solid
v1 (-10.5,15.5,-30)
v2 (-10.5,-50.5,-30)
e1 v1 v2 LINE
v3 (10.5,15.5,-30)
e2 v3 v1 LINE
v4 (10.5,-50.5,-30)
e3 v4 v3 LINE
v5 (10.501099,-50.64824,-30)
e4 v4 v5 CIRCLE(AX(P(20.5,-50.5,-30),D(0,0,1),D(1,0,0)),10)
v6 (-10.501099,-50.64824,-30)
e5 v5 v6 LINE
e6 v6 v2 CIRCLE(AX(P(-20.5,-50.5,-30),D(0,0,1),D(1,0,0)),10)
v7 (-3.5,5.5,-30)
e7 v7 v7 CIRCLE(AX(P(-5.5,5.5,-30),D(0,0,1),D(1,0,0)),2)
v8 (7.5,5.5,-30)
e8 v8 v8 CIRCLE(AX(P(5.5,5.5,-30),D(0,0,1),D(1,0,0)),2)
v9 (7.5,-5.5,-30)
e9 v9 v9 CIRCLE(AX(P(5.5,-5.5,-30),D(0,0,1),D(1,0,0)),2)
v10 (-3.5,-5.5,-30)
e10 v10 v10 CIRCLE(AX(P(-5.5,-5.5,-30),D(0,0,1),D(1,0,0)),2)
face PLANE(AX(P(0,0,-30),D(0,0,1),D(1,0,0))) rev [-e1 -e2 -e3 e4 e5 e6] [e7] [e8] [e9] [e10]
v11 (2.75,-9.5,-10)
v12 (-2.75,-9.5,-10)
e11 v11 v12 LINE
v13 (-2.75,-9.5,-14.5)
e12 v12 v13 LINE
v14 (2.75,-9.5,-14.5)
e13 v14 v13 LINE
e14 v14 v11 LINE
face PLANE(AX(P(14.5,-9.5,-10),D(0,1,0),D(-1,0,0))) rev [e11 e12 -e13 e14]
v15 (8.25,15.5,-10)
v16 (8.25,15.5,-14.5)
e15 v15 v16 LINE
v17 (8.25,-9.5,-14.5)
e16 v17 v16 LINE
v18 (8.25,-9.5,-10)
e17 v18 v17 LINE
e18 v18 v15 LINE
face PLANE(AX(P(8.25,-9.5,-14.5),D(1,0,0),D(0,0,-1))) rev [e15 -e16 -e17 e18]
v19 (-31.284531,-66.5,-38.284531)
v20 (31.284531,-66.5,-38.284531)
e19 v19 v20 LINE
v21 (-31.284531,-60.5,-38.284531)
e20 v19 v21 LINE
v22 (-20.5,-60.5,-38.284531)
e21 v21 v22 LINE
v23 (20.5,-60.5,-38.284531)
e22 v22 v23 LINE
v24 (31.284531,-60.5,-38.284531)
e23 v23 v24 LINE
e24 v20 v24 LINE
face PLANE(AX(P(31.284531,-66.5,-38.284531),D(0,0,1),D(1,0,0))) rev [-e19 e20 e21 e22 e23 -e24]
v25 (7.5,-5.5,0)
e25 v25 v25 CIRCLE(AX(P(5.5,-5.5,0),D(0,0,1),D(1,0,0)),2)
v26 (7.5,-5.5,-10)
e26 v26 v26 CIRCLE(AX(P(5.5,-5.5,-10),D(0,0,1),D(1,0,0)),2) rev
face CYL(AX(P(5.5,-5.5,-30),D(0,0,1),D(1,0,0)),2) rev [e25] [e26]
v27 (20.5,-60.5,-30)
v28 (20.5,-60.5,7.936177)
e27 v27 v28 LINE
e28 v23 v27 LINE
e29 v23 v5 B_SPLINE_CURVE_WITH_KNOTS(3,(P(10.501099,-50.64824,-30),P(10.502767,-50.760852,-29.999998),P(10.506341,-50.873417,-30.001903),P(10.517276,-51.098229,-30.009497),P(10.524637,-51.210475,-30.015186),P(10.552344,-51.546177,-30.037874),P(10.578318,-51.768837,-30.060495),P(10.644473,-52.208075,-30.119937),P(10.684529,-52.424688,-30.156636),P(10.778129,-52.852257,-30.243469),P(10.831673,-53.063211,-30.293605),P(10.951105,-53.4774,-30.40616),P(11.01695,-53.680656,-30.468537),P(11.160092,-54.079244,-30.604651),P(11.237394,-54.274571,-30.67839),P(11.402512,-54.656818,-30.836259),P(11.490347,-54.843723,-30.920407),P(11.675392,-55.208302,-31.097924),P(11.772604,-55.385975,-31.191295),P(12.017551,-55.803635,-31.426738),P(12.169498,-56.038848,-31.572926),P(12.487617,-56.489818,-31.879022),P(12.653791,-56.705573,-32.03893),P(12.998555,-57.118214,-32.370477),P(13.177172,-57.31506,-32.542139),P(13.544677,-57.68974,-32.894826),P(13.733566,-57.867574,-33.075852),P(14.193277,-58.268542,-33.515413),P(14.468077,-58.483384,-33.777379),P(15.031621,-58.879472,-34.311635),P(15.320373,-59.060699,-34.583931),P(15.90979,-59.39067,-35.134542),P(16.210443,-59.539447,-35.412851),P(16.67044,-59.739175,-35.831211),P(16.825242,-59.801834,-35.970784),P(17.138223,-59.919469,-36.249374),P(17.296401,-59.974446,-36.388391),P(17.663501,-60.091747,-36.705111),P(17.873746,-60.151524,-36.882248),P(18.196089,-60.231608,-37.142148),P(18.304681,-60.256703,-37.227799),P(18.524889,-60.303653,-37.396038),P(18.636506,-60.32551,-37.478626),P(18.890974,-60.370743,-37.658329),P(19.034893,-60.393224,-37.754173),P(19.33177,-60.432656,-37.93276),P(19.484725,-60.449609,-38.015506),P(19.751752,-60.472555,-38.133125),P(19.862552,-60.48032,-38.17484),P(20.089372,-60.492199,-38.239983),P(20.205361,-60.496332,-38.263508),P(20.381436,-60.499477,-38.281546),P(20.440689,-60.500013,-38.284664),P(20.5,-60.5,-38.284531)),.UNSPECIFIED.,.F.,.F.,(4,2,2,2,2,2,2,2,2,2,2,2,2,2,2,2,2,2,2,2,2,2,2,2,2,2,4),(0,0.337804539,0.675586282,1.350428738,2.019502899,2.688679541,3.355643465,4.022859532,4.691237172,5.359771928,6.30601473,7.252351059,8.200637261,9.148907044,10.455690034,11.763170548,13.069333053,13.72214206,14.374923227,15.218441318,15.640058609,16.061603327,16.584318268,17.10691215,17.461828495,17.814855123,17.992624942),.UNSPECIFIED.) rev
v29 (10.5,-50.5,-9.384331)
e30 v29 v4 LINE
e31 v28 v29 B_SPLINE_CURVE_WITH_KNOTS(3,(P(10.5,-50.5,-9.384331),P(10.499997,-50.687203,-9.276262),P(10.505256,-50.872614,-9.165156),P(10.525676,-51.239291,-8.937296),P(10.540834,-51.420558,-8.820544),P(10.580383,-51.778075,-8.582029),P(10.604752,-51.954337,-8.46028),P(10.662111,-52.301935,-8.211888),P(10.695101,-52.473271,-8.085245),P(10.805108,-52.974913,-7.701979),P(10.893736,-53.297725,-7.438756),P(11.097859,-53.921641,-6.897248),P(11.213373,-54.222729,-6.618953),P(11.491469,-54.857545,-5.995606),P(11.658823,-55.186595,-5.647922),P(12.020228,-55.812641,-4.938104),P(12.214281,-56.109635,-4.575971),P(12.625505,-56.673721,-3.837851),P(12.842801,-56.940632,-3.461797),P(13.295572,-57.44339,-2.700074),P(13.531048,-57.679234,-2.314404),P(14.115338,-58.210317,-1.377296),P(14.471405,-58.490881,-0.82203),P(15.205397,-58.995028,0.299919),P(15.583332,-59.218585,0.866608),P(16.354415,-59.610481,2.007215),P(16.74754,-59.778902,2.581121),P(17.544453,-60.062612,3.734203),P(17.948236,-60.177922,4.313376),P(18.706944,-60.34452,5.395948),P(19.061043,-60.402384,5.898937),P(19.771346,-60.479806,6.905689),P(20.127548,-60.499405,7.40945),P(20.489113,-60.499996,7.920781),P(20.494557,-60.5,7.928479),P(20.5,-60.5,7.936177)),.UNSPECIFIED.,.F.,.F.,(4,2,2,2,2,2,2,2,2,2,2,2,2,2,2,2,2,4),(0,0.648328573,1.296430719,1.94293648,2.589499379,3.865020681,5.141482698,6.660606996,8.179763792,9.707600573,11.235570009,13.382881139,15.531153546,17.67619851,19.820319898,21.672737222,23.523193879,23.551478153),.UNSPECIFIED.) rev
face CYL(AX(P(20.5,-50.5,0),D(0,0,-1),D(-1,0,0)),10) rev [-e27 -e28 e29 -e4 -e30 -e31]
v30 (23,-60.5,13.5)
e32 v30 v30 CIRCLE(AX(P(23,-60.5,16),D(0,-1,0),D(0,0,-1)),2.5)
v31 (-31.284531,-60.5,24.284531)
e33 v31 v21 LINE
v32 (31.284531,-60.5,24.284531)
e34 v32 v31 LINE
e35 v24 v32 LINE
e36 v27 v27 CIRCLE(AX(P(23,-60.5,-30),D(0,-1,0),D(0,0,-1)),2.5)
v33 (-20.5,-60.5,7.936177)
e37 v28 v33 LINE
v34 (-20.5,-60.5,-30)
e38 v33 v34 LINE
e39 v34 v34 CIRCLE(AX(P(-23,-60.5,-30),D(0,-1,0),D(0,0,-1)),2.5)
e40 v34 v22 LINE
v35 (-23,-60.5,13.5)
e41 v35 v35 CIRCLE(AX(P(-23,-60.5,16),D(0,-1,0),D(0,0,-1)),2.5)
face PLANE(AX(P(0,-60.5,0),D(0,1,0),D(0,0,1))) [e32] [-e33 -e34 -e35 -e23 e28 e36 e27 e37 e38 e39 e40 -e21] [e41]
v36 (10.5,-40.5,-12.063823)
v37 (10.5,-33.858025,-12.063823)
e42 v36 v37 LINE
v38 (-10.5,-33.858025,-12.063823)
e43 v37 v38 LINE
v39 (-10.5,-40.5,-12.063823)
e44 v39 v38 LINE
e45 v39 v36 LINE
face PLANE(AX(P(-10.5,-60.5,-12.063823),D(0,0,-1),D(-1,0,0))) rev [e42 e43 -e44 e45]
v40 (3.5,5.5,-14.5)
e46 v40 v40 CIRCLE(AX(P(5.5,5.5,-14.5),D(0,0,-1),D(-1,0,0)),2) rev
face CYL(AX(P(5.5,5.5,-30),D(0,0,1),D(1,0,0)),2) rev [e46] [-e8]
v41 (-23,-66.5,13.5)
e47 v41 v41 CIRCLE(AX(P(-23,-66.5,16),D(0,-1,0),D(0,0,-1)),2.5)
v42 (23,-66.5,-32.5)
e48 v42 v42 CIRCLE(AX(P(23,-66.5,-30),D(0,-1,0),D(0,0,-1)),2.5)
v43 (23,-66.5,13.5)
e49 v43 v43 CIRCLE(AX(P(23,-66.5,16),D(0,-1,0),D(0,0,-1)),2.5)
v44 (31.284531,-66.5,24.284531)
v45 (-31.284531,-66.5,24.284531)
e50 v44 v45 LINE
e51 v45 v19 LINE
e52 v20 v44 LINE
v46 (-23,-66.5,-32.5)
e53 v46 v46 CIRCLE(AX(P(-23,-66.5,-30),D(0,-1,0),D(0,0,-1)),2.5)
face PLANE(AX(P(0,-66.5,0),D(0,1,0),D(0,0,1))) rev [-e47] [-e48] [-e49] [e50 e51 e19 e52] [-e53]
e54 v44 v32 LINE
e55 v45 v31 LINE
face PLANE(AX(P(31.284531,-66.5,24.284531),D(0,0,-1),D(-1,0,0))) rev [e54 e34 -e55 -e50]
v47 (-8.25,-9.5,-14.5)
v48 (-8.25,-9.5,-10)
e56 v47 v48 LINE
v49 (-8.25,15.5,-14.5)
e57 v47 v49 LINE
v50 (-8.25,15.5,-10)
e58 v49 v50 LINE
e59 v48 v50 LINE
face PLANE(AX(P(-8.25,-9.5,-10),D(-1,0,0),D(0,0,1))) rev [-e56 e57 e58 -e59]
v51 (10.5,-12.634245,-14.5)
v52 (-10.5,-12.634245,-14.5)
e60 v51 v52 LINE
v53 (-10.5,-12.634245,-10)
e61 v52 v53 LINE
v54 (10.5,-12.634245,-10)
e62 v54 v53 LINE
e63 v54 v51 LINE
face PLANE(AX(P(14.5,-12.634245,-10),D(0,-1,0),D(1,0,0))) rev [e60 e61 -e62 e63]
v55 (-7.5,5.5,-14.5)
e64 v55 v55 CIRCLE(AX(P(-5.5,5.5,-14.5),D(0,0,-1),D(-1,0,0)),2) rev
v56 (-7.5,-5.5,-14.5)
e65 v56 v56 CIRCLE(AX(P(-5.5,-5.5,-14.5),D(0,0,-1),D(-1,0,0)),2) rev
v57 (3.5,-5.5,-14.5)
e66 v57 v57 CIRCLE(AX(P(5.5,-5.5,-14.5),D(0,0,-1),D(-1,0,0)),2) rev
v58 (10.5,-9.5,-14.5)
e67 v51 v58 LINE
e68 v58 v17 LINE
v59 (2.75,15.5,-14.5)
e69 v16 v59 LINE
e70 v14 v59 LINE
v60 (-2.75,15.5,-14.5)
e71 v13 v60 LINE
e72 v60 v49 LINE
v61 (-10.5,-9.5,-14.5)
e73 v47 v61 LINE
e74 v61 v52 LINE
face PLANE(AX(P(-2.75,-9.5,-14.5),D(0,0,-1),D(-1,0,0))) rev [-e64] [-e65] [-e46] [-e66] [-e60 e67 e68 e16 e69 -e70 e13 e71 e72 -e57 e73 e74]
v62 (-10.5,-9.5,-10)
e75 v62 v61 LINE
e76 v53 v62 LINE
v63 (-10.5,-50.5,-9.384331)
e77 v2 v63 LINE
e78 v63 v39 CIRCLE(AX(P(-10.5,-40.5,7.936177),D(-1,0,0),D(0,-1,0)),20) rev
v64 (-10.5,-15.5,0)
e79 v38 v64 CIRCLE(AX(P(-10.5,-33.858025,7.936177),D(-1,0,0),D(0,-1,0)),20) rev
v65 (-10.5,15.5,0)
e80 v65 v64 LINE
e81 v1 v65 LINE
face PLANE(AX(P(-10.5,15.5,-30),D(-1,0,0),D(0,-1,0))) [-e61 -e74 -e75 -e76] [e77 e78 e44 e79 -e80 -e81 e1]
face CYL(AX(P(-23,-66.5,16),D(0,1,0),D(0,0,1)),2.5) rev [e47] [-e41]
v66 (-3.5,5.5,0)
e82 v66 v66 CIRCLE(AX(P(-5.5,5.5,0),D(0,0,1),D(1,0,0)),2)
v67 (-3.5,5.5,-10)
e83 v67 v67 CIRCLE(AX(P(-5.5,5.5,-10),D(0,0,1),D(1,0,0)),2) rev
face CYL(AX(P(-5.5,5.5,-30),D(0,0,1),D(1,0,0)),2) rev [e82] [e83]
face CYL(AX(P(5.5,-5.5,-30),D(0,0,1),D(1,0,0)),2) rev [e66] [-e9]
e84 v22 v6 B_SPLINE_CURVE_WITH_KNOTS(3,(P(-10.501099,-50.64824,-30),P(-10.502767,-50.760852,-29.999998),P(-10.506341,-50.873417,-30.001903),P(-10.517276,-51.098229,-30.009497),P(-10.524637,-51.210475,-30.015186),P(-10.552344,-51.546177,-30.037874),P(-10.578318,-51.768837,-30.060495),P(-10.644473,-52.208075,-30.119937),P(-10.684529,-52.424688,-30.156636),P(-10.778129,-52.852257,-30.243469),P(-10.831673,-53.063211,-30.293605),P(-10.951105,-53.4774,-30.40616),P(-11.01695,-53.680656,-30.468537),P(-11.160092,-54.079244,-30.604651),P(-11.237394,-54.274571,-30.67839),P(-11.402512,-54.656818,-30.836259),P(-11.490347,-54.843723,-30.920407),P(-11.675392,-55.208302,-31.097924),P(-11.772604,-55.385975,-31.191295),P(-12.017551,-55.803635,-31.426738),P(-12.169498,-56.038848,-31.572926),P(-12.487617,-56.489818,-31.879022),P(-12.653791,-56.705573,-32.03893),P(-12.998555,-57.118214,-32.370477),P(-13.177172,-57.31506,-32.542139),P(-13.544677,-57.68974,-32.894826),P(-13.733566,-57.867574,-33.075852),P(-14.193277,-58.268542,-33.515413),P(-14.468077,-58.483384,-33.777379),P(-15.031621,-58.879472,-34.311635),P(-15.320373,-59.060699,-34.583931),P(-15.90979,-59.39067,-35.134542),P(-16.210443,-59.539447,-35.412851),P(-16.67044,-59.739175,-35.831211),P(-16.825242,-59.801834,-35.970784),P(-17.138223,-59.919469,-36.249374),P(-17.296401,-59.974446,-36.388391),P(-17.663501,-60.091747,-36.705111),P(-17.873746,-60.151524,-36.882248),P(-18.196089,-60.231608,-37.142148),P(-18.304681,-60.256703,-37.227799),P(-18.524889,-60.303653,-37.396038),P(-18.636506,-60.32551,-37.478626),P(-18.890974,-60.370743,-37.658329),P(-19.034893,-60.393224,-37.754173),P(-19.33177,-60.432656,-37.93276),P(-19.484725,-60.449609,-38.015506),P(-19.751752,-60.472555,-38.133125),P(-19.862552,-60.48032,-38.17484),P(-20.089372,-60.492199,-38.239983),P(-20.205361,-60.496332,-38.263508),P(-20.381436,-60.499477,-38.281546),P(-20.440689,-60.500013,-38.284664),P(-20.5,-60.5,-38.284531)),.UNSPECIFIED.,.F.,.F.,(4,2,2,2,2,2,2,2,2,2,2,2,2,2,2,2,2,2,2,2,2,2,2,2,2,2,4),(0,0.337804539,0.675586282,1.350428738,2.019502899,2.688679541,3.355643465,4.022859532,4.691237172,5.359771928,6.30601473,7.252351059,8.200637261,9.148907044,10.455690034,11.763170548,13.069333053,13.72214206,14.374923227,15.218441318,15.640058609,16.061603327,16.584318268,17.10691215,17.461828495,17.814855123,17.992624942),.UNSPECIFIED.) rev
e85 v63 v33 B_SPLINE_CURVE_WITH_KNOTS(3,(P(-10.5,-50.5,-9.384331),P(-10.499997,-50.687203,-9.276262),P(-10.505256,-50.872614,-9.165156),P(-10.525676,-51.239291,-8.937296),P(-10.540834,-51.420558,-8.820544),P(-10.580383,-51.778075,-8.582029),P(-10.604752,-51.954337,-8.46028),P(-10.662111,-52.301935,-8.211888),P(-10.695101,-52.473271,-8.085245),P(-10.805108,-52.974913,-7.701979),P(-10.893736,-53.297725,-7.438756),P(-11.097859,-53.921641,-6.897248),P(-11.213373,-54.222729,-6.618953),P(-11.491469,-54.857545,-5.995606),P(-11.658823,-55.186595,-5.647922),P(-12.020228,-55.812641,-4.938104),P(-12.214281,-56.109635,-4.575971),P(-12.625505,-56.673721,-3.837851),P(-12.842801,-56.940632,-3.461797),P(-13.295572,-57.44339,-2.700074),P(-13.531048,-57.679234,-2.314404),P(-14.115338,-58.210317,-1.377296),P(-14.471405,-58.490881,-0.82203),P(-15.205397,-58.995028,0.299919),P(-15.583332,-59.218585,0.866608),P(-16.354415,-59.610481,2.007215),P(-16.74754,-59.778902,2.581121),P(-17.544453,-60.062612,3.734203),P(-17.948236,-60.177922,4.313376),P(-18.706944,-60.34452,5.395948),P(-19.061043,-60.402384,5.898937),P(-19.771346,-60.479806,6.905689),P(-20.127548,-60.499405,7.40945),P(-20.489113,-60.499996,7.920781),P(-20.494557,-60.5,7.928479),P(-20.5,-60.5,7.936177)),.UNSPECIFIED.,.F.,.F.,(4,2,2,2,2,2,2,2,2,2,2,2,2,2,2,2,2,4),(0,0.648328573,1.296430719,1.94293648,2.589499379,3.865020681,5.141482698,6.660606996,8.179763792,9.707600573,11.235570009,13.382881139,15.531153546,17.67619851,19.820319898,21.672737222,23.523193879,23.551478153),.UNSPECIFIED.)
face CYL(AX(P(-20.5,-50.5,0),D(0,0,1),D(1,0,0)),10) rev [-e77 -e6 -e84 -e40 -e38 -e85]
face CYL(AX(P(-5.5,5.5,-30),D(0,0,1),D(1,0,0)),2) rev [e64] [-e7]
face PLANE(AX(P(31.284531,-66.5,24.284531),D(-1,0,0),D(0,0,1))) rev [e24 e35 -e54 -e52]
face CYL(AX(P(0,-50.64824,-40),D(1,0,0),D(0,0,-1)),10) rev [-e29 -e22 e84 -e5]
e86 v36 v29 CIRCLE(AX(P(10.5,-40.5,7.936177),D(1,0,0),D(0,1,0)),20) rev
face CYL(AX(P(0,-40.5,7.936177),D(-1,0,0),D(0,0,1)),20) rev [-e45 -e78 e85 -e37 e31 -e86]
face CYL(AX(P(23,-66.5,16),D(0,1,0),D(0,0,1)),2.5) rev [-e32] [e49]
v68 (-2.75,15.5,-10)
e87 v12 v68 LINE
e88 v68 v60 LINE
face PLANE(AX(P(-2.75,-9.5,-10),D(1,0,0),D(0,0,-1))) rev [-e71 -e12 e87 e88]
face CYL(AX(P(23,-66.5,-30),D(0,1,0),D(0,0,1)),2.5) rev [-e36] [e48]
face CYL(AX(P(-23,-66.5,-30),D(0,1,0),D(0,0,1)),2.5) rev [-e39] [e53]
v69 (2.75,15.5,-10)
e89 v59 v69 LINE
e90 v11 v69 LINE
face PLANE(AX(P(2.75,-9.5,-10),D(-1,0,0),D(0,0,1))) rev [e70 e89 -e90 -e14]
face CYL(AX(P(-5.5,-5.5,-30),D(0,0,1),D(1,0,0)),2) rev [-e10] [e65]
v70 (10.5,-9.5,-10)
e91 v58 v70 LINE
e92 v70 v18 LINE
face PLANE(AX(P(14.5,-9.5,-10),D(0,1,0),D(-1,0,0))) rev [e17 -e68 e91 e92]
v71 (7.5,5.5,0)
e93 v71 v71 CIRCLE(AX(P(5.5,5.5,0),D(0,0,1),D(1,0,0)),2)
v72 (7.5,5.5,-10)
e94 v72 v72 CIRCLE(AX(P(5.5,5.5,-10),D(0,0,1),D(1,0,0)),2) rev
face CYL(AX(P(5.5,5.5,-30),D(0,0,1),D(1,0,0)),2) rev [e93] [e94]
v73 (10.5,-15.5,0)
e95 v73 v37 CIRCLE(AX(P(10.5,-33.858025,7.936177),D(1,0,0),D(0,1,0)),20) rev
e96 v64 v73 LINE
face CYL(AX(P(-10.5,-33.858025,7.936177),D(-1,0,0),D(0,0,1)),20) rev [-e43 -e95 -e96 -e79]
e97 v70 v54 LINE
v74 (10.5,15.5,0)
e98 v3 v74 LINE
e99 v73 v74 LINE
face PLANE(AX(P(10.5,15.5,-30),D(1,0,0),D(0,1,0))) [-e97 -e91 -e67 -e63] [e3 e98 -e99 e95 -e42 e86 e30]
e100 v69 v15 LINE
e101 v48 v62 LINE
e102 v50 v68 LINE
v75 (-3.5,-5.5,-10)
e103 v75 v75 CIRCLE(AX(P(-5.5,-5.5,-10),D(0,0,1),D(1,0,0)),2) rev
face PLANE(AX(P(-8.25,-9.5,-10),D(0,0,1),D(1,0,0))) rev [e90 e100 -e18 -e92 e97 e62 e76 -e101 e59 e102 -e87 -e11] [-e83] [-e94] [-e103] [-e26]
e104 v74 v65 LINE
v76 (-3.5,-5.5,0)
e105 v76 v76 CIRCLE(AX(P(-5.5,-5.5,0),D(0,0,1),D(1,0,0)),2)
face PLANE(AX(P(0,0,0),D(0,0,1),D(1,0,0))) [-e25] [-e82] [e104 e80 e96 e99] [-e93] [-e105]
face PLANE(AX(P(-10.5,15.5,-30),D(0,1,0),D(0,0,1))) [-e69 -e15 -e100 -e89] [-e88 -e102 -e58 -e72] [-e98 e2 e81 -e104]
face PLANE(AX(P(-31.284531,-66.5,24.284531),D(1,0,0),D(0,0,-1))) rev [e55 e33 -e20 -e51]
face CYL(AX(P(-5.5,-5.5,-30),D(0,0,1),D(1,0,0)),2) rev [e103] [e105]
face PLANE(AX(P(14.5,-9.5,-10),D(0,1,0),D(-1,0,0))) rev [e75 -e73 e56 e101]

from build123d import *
from OCP.BRepAlgoAPI import BRepAlgoAPI_Cut
from OCP.TopTools import TopTools_ListOfShape

# Parameters (mm, degrees)
SKETCH1_W           = 21
SKETCH1_H           = 31
BOSS_EXTRUDE1_DEPTH = 30
SKETCH2_W           = 21
SKETCH2_H           = 17.936176812
BOSS_EXTRUDE2_DEPTH = 45
SKETCH6_R           = 2
CUT_EXTRUDE1_DEPTH  = 30
SKETCH8_W           = 62.569062922
SKETCH8_H           = 62.569062922
SKETCH8_R           = 2.5
BOSS_EXTRUDE6_DEPTH = 6
FILLET1_R           = 20
FILLET2_R           = 20
FILLET3_START       = -10.5
FILLET3_DEPTH       = 21
FILLET3_START_2     = -38.284535634
FILLET3_2_DEPTH     = 46.220712446
FILLET3_START_3     = -22
FILLET3_3_DEPTH     = 43
SKETCH9_W           = 5.5
SKETCH9_H           = 4.5
CUT_EXTRUDE2_DEPTH  = 25
SKETCH10_W          = 4.5
SKETCH10_H          = 3.134245462
CUT_EXTRUDE3_DEPTH  = 25


with BuildPart() as part:
    # Sketch1 → Boss-Extrude1 (new body)
    with BuildSketch(Plane.XY):
        Rectangle(SKETCH1_W, SKETCH1_H)
    extrude(amount=-BOSS_EXTRUDE1_DEPTH)

    # Sketch2 → Boss-Extrude2 (add)
    with BuildSketch(Plane.XZ.offset(15.5)):
        with Locations((0, -21.031911594)):
            Rectangle(SKETCH2_W, SKETCH2_H)
    extrude(amount=BOSS_EXTRUDE2_DEPTH)

    # Sketch6 → Cut-Extrude1 (cut)
    with BuildSketch(Plane.XY):
        with Locations((5.5, 5.5)):
            Circle(SKETCH6_R)
        with Locations((5.5, -5.5)):
            Circle(SKETCH6_R)
        with Locations((-5.5, -5.5)):
            Circle(SKETCH6_R)
        with Locations((-5.5, 5.5)):
            Circle(SKETCH6_R)
    extrude(amount=-CUT_EXTRUDE1_DEPTH, mode=Mode.SUBTRACT)

    # Sketch8 → Boss-Extrude6 (add)
    with BuildSketch(Plane.XZ.offset(60.5)):
        with Locations((0, -7)):
            Rectangle(SKETCH8_W, SKETCH8_H)
        with Locations(Location((23, 16, 0), (0, 0, 270))):
            Circle(SKETCH8_R, mode=Mode.SUBTRACT)
        with Locations(Location((23, -30, 0), (0, 0, 270))):
            Circle(SKETCH8_R, mode=Mode.SUBTRACT)
        with Locations(Location((-23, -30, 0), (0, 0, 270))):
            Circle(SKETCH8_R, mode=Mode.SUBTRACT)
        with Locations(Location((-23, 16, 0), (0, 0, 270))):
            Circle(SKETCH8_R, mode=Mode.SUBTRACT)
    extrude(amount=BOSS_EXTRUDE6_DEPTH)

    # Fillet1
    fillet1_edges = [part.edges().sort_by_distance(p)[0] for p in [
        (0, -60.5, -12.063823188),
    ]]
    fillet(fillet1_edges, radius=FILLET1_R)

    # Fillet2
    # the kernel refuses this fillet: 20 mm, written as the material it adds along each edge
    with BuildSketch(Plane(origin=(-10.5, -15.5, -12.063823188), x_dir=(0, 0, 1), z_dir=(1, 0, 0))) as fillet2_piece_1:
        with BuildLine():
            CenterArc((20, 18.358025428), FILLET2_R, 180, 66.621165334)
            Line((0, 18.358025428), (-0.4, 18.358025428))
            Line((-0.4, 18.358025428), (-0.4, 0))
            Line((-0.4, 0), (0, -0.4))
            ThreePointArc((0, -0.4), (6.031911594, -0.4), (11.905099651, -0.367160509))
            Line((11.905099651, -0.367160509), (12.063823188, 0))
        make_face()
    extrude(amount=21)


with BuildPart() as fillet3_tool:
    # Fillet3: read off the stored shape, not the designer's step
    # Fillet3 outline → Fillet3 (new body)
    with BuildSketch(Plane.YZ.offset(FILLET3_START)):
        with BuildLine():
            ThreePointArc((-60.5, -38.284531461), (-57.084283982, -32.34641635), (-50.648240376, -30))
            Line((-50.648240376, -30), (-60.5, -30))
            Line((-60.5, -30), (-60.5, -38.284531461))
        make_face()
    extrude(amount=FILLET3_DEPTH)


with BuildPart() as part_1:
    add(part.part)


with BuildPart() as part_2:
    # Fillet3: joined with fillet3_tool
    add(part_1.part.fuse(fillet3_tool.part, tol=0.00001))


with BuildPart() as fillet3_2_tool:
    # Fillet3 2 outline → Fillet3 2 (new body)
    with BuildSketch(Plane.XY.offset(FILLET3_START_2)):
        with BuildLine():
            Line((10.5, -50.5), (10.5, -60.5))
            Line((10.5, -60.5), (20.5, -60.5))
            ThreePointArc((20.5, -60.5), (13.428932188, -57.571067812), (10.5, -50.5))
        make_face()
        with BuildLine():
            ThreePointArc((-10.5, -50.5), (-13.428932188, -57.571067812), (-20.5, -60.5))
            Line((-20.5, -60.5), (-10.5, -60.5))
            Line((-10.5, -60.5), (-10.5, -50.5))
        make_face()
    extrude(amount=FILLET3_2_DEPTH)


with BuildPart() as part_3:
    add(part_2.part)


with BuildPart() as part_4:
    # Fillet3 2: joined with fillet3_2_tool
    add(part_3.part.fuse(fillet3_2_tool.part, tol=0.00001))


with BuildPart() as fillet3_3_tool:
    # Fillet3 3 outline → Fillet3 3 (new body)
    with BuildSketch(Plane.YZ.offset(FILLET3_START_3)):
        with BuildLine():
            ThreePointArc((-50.648240376, -30), (-57.084283982, -32.34641635), (-60.5, -38.284531461))
            Line((-60.5, -38.284531461), (-50.5, -38.284535634))
            Line((-50.5, -38.284535634), (-50.5, -30))
            Line((-50.5, -30), (-50.648240376, -30))
        make_face()
        with BuildLine():
            Line((-50.5, 7.936176812), (-60.5, 7.936176812))
            ThreePointArc((-60.5, 7.936176812), (-57.820508076, -2.063823188), (-50.5, -9.384331263))
            Line((-50.5, -9.384331263), (-50.5, 7.936176812))
        make_face()
    extrude(amount=FILLET3_3_DEPTH)


with BuildPart() as part_5:
    add(part_4.part)

    # Fillet3 3: cut by fillet3_3_tool, with a tolerance
    fillet3_3_stock = TopTools_ListOfShape()
    fillet3_3_stock.Append(part_5.part.wrapped)
    fillet3_3_tools = TopTools_ListOfShape()
    fillet3_3_tools.Append(fillet3_3_tool.part.wrapped)
    fillet3_3_cut = BRepAlgoAPI_Cut()
    fillet3_3_cut.SetArguments(fillet3_3_stock)
    fillet3_3_cut.SetTools(fillet3_3_tools)
    fillet3_3_cut.SetFuzzyValue(0.00001)
    fillet3_3_cut.Build()
    add(Compound.cast(fillet3_3_cut.Shape()).solids(), mode=Mode.REPLACE)

    # Sketch9 → Cut-Extrude2 (cut)
    with BuildSketch(Plane(origin=(0, 15.5, 0), x_dir=(1, 0, 0), z_dir=(0, 1, 0))):
        with Locations((-5.5, 12.25)):
            Rectangle(SKETCH9_W, SKETCH9_H)
        with Locations((5.5, 12.25)):
            Rectangle(SKETCH9_W, SKETCH9_H)
    extrude(amount=-CUT_EXTRUDE2_DEPTH, mode=Mode.SUBTRACT)

    # Sketch10 → Cut-Extrude3 (cut)
    with BuildSketch(Plane.ZY.offset(10.5)):
        with Locations((-12.25, -11.067122731)):
            Rectangle(SKETCH10_W, SKETCH10_H)
    extrude(amount=-CUT_EXTRUDE3_DEPTH, mode=Mode.SUBTRACT)


solid = part_5.part
